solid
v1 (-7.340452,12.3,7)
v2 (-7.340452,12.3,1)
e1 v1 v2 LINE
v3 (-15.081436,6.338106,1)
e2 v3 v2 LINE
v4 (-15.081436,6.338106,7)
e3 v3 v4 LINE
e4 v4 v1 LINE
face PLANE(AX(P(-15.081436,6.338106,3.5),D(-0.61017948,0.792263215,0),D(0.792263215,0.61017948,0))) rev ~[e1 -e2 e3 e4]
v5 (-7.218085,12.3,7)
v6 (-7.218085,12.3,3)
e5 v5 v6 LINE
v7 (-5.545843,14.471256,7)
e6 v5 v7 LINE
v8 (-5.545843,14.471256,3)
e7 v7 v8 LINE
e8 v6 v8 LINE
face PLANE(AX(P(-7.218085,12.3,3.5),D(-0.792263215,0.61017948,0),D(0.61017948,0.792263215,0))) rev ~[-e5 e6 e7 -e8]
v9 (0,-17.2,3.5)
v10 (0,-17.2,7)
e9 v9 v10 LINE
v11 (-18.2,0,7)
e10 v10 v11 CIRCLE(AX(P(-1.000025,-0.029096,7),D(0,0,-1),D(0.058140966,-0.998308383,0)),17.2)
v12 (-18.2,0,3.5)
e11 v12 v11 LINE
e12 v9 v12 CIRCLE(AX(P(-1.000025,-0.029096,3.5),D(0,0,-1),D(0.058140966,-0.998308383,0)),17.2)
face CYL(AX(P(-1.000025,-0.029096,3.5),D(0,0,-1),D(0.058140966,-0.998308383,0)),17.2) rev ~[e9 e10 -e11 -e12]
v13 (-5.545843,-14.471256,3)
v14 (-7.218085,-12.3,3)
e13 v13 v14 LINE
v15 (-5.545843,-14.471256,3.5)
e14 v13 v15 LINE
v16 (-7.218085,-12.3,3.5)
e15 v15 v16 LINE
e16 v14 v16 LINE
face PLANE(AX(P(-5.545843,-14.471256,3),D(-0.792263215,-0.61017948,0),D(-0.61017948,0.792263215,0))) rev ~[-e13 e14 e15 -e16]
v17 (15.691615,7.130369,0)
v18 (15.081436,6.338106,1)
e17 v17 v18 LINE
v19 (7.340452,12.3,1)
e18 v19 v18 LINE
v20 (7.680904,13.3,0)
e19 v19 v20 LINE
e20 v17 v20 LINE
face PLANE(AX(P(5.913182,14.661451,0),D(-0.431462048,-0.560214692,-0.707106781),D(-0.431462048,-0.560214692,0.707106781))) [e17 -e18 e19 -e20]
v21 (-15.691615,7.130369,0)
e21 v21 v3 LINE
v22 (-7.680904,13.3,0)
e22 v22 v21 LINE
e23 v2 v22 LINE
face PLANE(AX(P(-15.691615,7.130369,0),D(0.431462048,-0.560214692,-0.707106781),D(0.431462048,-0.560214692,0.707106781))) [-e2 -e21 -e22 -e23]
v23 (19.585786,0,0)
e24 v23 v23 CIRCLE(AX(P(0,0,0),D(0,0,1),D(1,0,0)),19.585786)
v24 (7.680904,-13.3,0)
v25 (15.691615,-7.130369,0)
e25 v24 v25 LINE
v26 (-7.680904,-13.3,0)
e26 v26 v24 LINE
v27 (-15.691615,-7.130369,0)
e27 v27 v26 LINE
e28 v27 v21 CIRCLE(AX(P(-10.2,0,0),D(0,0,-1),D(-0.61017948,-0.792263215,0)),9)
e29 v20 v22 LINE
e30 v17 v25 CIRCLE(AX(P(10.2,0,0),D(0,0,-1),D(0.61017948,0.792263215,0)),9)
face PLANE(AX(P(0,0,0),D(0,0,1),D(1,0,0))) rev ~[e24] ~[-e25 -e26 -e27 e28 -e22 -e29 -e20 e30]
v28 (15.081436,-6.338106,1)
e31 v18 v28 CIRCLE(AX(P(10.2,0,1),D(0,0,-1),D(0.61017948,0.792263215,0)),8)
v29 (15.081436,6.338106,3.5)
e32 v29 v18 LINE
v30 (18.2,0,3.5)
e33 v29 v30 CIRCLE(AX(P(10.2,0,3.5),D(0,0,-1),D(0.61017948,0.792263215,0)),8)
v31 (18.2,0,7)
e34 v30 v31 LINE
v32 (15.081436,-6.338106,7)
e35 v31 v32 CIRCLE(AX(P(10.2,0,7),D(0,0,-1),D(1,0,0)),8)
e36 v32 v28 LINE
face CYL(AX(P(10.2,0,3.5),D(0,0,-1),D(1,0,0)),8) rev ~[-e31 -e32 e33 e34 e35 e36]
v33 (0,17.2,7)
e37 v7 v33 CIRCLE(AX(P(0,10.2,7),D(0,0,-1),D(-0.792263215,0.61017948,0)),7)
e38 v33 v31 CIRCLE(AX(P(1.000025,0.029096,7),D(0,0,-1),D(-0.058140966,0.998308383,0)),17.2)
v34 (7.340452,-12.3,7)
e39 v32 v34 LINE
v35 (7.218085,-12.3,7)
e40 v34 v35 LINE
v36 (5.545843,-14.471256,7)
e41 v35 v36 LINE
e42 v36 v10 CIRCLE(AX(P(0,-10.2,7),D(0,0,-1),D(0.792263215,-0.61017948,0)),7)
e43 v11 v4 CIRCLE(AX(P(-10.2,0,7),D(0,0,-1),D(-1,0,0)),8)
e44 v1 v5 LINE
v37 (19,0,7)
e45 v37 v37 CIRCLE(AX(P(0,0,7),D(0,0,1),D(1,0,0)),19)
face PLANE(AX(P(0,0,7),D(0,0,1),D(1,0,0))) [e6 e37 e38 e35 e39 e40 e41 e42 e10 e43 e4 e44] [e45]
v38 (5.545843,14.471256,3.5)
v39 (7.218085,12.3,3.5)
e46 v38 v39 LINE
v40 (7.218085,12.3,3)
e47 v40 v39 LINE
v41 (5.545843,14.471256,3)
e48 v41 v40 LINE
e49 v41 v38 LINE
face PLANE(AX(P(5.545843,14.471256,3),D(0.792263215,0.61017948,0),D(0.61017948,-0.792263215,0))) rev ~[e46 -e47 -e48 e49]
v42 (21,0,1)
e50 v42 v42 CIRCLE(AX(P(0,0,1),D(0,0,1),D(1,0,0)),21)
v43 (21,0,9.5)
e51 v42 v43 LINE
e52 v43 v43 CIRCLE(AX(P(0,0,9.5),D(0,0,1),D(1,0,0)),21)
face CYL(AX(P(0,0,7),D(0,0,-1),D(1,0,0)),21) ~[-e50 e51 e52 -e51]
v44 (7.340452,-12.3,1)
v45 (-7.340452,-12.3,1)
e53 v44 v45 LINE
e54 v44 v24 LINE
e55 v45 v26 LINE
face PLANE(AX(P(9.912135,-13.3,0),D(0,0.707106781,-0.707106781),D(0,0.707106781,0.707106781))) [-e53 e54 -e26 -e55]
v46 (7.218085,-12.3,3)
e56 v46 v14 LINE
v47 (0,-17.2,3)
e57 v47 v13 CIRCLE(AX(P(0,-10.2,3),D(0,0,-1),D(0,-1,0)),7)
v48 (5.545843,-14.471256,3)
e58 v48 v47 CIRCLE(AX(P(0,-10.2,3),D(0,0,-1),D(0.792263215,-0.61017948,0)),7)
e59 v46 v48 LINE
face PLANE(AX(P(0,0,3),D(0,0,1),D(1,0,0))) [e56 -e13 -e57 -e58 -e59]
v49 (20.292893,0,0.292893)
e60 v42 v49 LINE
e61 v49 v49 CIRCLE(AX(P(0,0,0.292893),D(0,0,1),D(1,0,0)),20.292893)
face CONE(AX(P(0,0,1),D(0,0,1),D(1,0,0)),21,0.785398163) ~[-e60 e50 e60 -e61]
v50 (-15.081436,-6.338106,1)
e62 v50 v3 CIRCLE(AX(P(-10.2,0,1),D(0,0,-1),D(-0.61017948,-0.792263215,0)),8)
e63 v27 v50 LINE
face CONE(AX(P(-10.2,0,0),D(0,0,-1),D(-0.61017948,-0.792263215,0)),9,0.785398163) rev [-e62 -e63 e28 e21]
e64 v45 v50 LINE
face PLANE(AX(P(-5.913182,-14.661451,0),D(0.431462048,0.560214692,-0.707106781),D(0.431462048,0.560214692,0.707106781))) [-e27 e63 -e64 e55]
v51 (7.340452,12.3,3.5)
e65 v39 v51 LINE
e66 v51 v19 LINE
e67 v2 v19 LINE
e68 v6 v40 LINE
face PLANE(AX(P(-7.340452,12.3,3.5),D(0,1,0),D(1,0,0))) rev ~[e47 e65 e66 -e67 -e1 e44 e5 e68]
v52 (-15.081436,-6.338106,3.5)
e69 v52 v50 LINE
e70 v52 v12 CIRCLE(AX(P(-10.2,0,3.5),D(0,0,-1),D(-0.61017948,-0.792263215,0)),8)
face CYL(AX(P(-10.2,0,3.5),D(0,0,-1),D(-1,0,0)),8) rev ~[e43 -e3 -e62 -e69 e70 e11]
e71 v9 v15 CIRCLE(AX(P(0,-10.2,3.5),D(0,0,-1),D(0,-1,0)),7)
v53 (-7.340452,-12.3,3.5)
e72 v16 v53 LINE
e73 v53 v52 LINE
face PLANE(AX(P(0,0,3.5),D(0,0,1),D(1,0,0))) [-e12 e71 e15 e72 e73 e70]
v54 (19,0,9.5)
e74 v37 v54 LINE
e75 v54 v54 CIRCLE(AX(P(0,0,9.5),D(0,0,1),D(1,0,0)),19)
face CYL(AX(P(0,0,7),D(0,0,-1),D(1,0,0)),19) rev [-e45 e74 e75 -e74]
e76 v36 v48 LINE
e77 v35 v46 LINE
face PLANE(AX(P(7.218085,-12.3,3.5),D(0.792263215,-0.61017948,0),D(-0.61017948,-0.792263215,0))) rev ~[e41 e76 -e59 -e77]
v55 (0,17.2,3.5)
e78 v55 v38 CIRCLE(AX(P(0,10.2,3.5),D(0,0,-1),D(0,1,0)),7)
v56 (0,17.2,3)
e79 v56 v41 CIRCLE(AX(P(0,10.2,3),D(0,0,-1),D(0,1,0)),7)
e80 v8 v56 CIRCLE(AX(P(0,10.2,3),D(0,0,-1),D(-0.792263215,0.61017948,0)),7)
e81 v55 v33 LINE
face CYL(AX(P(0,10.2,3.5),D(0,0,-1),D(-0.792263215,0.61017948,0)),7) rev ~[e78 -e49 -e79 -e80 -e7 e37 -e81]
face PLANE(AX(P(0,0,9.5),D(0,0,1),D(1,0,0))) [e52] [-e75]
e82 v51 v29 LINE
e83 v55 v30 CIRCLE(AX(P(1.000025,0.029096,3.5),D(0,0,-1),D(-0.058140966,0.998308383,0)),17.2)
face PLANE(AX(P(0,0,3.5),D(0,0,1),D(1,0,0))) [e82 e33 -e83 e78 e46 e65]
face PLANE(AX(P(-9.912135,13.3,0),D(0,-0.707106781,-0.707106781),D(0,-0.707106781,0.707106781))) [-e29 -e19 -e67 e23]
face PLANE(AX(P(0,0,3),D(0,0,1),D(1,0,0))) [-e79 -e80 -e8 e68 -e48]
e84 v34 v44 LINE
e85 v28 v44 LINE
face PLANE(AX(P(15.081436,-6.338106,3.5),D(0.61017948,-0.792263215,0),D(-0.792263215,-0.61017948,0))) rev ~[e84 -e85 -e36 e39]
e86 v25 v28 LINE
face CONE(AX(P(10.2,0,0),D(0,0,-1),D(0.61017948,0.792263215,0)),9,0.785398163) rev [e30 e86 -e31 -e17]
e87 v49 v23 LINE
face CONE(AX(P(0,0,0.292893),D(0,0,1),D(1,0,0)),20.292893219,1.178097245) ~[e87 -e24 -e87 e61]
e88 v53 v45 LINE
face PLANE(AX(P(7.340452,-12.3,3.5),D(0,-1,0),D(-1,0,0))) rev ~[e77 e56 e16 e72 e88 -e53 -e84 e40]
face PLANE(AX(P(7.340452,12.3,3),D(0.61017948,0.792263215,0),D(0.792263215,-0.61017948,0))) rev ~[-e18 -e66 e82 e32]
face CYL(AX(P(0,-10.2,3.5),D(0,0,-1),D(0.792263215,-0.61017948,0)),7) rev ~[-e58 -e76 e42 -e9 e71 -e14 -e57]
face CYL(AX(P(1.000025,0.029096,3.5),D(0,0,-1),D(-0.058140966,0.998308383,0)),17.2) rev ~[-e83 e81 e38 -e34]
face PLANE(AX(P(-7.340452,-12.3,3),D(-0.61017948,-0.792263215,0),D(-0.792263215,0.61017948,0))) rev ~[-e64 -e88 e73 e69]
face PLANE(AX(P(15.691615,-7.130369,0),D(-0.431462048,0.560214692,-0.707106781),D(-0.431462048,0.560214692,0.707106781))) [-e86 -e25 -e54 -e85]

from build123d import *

# Parameters (mm, degrees)
F0_R         = 21
F1_DEPTH     = 3
F2_R         = 21
F3_DEPTH     = 0.5
F4_R         = 21
F5_DEPTH     = 3.5
F6_R         = 21
F6_R_2       = 19
F7_DEPTH     = 2.5
F8_SIZE      = 1
F9_T6_DEPTH  = 12.3424053326
F9_T11_DEPTH = 19.8242698458
F9_T17_DEPTH = 12.3424053326
F9_T20_ANGLE = 104.7950367117
F9_T24_DEPTH = 12.3424053326
F9_T29_DEPTH = 19.8242698458
F9_T35_DEPTH = 12.3424053326
F9_T38_ANGLE = 104.7950367117
F9_T43_DEPTH = 12.3424053326
F9_T47_DEPTH = 19.8242698458
F9_T54_DEPTH = 19.8242698458
F9_T58_DEPTH = 12.3424053326
F9_T65_DEPTH = 12.3424053326
F9_T69_DEPTH = 19.8242698458
F9_T76_DEPTH = 19.8242698458
F9_T80_DEPTH = 12.3424053326


# Not quite as in the source:
# - a fillet or chamfer that OpenCascade refuses, or shapes differently, is made with other operations: its cross-section is extruded or revolved along the edge and cut away or added


with BuildPart() as f1:
    # F0 (on Top) → F1 (new body)
    with BuildSketch(Plane.XY):
        Circle(F0_R)
        with BuildLine():
            Line((-15.0814358373, 6.3381057238), (-7.340451935, 12.3))
            Line((-7.340451935, 12.3), (7.340451935, 12.3))
            Line((7.340451935, 12.3), (15.0814358373, 6.3381057238))
            ThreePointArc((15.0814358373, 6.3381057238), (18.2, 0), (15.0814358373, -6.3381057238))
            Line((15.0814358373, -6.3381057238), (7.340451935, -12.3))
            Line((7.340451935, -12.3), (-7.340451935, -12.3))
            Line((-7.340451935, -12.3), (-15.0814358373, -6.3381057238))
            ThreePointArc((-15.0814358373, -6.3381057238), (-18.2, 0), (-15.0814358373, 6.3381057238))
        make_face(mode=Mode.SUBTRACT)
    extrude(amount=F1_DEPTH)

    # F2 (on face) → F3 (join)
    with BuildSketch(Plane.XY.offset(3)):
        Circle(F2_R)
        with BuildLine():
            Line((-15.0814358373, 6.3381057238), (-7.340451935, 12.3))
            Line((-7.340451935, 12.3), (-7.2180848246, 12.3))
            Line((-7.2180848246, 12.3), (-5.5458425084, 14.4712563576))
            ThreePointArc((-5.5458425084, 14.4712563576), (-3.0904049489, 16.4808755163), (0, 17.2))
            ThreePointArc((0, 17.2), (3.0904049489, 16.4808755163), (5.5458425084, 14.4712563576))
            Line((5.5458425084, 14.4712563576), (7.2180848246, 12.3))
            Line((7.2180848246, 12.3), (7.340451935, 12.3))
            Line((7.340451935, 12.3), (15.0814358373, 6.3381057238))
            ThreePointArc((15.0814358373, 6.3381057238), (17.3781434472, 3.5318913702), (18.2, 0))
            ThreePointArc((18.2, 0), (17.3781434472, -3.5318913702), (15.0814358373, -6.3381057238))
            Line((15.0814358373, -6.3381057238), (7.340451935, -12.3))
            Line((7.340451935, -12.3), (7.2180848246, -12.3))
            Line((7.2180848246, -12.3), (5.5458425084, -14.4712563576))
            ThreePointArc((5.5458425084, -14.4712563576), (3.0904049489, -16.4808755163), (0, -17.2))
            ThreePointArc((0, -17.2), (-3.0904049489, -16.4808755163), (-5.5458425084, -14.4712563576))
            Line((-5.5458425084, -14.4712563576), (-7.2180848246, -12.3))
            Line((-7.2180848246, -12.3), (-7.340451935, -12.3))
            Line((-7.340451935, -12.3), (-15.0814358373, -6.3381057238))
            ThreePointArc((-15.0814358373, -6.3381057238), (-17.3781434472, -3.5318913702), (-18.2, 0))
            ThreePointArc((-18.2, 0), (-17.3781434472, 3.5318913702), (-15.0814358373, 6.3381057238))
        make_face(mode=Mode.SUBTRACT)
    extrude(amount=F3_DEPTH)

    # F4 (on face) → F5 (join)
    with BuildSketch(Plane.XY.offset(3.5)):
        Circle(F4_R)
        with BuildLine():
            Line((-15.0814358373, 6.3381057238), (-7.340451935, 12.3))
            Line((-7.340451935, 12.3), (-7.2180848246, 12.3))
            Line((-7.2180848246, 12.3), (-5.5458425084, 14.4712563576))
            ThreePointArc((-5.5458425084, 14.4712563576), (-3.0904049489, 16.4808755163), (0, 17.2))
            ThreePointArc((0, 17.2), (12.8139825122, 12.529911728), (18.2, 0))
            ThreePointArc((18.2, 0), (17.3781434472, -3.5318913702), (15.0814358373, -6.3381057238))
            Line((15.0814358373, -6.3381057238), (7.340451935, -12.3))
            Line((7.340451935, -12.3), (7.2180848246, -12.3))
            Line((7.2180848246, -12.3), (5.5458425084, -14.4712563576))
            ThreePointArc((5.5458425084, -14.4712563576), (3.0904049489, -16.4808755163), (0, -17.2))
            ThreePointArc((0, -17.2), (-12.8139825122, -12.529911728), (-18.2, 0))
            ThreePointArc((-18.2, 0), (-17.3781434472, 3.5318913702), (-15.0814358373, 6.3381057238))
        make_face(mode=Mode.SUBTRACT)
    extrude(amount=F5_DEPTH)

    # F6 (on face) → F7 (join)
    with BuildSketch(Plane.XY.offset(7)):
        Circle(F6_R)
        Circle(F6_R_2, mode=Mode.SUBTRACT)
    extrude(amount=F7_DEPTH)

    # F8
    f8_edges = [f1.edges().sort_by_distance(p)[0] for p in [
        (-21, 0, 0),
    ]]
    chamfer(f8_edges, length=F8_SIZE)

    # F9: chamfer of 1 on 9 edges, made by hand

    # F9_s1 → F9_t2 (revolve, cut)
    with BuildSketch(Plane.XZ):
        Polygon((20.2928932188, 0.2928932188), (19.5857864376, 0), (20, 0), align=None)
    revolve(axis=Axis((0, 0, 0), (0, 0, 1)), mode=Mode.SUBTRACT)


with BuildPart() as f9_tool4:
    # F9_s5 → F9_t6 (new body)
    with BuildSketch(Plane(origin=(-6.4023462265, -4.9309121171, 0), x_dir=(0, 0, 1), z_dir=(0.7922632155, 0.6101794797, 0))):
        Polygon((0, -15.2238306925), (1, -14.2238306925), (0, -14.2238306925), align=None)
    extrude(amount=F9_T6_DEPTH)

    split(bisect_by=Plane.XZ.offset(-12.3), keep=Keep.TOP)


with BuildPart() as f1_1:
    add(f1.part)

    # F9_t3: cut F9_tool4
    add(f9_tool4.part, mode=Mode.SUBTRACT)


with BuildPart() as f9_tool9:
    # F9_s10 → F9_t11 (new body)
    with BuildSketch(Plane.YZ.offset(-9.9121349229)):
        Polygon((13.3, 0), (12.3, 1), (12.3, 0), align=None)
    extrude(amount=F9_T11_DEPTH)

    split(bisect_by=Plane(origin=(-8.6790896108, 11.2690178409, 0), x_dir=(0, 0, 1), z_dir=(0.6101794797, -0.7922632155, 0)), keep=Keep.TOP)

    split(bisect_by=Plane(origin=(8.6790896108, 11.2690178409, 0), x_dir=(0, 0, 1), z_dir=(-0.6101794797, -0.7922632155, 0)), keep=Keep.TOP)


with BuildPart() as f1_2:
    add(f1_1.part)

    # F9_t8: cut F9_tool9
    add(f9_tool9.part, mode=Mode.SUBTRACT)


with BuildPart() as f9_tool15:
    # F9_s16 → F9_t17 (new body)
    with BuildSketch(Plane(origin=(-3.376087509, 2.6001703465, 0), x_dir=(0, 0, 1), z_dir=(0.7922632155, -0.6101794797, 0))):
        Polygon((0, -15.2238306925), (1, -14.2238306925), (0, -14.2238306925), align=None)
    extrude(amount=F9_T17_DEPTH)

    split(bisect_by=Plane.XZ.offset(-12.3), keep=Keep.TOP)


with BuildPart() as f1_3:
    add(f1_2.part)

    # F9_t14: cut F9_tool15
    add(f9_tool15.part, mode=Mode.SUBTRACT)

    # F9_s19 → F9_t20 (revolve, cut)
    with BuildSketch(Plane(origin=(6.4023462265, -4.9309121171, 0), x_dir=(0, 0, 1), z_dir=(-0.7922632155, 0.6101794797, 0))):
        Polygon((0, 15.2238306925), (1, 14.2238306925), (0, 14.2238306925), align=None)
    revolve(axis=Axis((10.2, 0, 0), (0, 0, -1)), revolution_arc=F9_T20_ANGLE, mode=Mode.SUBTRACT)


with BuildPart() as f9_tool22:
    # F9_s23 → F9_t24 (new body)
    with BuildSketch(Plane(origin=(6.4023462265, 4.9309121171, 0), x_dir=(0, 0, 1), z_dir=(-0.7922632155, -0.6101794797, 0))):
        Polygon((0, -15.2238306925), (1, -14.2238306925), (0, -14.2238306925), align=None)
    extrude(amount=F9_T24_DEPTH)

    split(bisect_by=Plane.XZ.offset(12.3), keep=Keep.BOTTOM)


with BuildPart() as f1_4:
    add(f1_3.part)

    # F9_t21: cut F9_tool22
    add(f9_tool22.part, mode=Mode.SUBTRACT)


with BuildPart() as f9_tool27:
    # F9_s28 → F9_t29 (new body)
    with BuildSketch(Plane.YZ.offset(9.9121349229)):
        Polygon((-13.3, 0), (-12.3, 1), (-12.3, 0), align=None)
    extrude(amount=-F9_T29_DEPTH)

    split(bisect_by=Plane(origin=(8.6790896108, -11.2690178409, 0), x_dir=(0, 0, 1), z_dir=(-0.6101794797, 0.7922632155, 0)), keep=Keep.TOP)

    split(bisect_by=Plane(origin=(-8.6790896108, -11.2690178409, 0), x_dir=(0, 0, 1), z_dir=(0.6101794797, 0.7922632155, 0)), keep=Keep.TOP)


with BuildPart() as f1_5:
    add(f1_4.part)

    # F9_t26: cut F9_tool27
    add(f9_tool27.part, mode=Mode.SUBTRACT)


with BuildPart() as f9_tool33:
    # F9_s34 → F9_t35 (new body)
    with BuildSketch(Plane(origin=(3.376087509, -2.6001703465, 0), x_dir=(0, 0, 1), z_dir=(-0.7922632155, 0.6101794797, 0))):
        Polygon((0, -15.2238306925), (1, -14.2238306925), (0, -14.2238306925), align=None)
    extrude(amount=F9_T35_DEPTH)

    split(bisect_by=Plane.XZ.offset(12.3), keep=Keep.BOTTOM)


with BuildPart() as f1_6:
    add(f1_5.part)

    # F9_t32: cut F9_tool33
    add(f9_tool33.part, mode=Mode.SUBTRACT)

    # F9_s37 → F9_t38 (revolve, cut)
    with BuildSketch(Plane(origin=(-6.4023462265, 4.9309121171, 0), x_dir=(0, 0, 1), z_dir=(0.7922632155, -0.6101794797, 0))):
        Polygon((0, 15.2238306925), (1, 14.2238306925), (0, 14.2238306925), align=None)
    revolve(axis=Axis((-10.2, 0, 0), (0, 0, -1)), revolution_arc=F9_T38_ANGLE, mode=Mode.SUBTRACT)


with BuildPart() as f9_tool41:
    # F9_s42 → F9_t43 (new body)
    with BuildSketch(Plane(origin=(-6.4023462265, -4.9309121171, 0), x_dir=(0, 0, 1), z_dir=(0.7922632155, 0.6101794797, 0))):
        Polygon((0, -15.2238306925), (1, -14.2238306925), (0, -14.2238306925), align=None)
    extrude(amount=F9_T43_DEPTH)

    split(bisect_by=Plane.XZ.offset(-12.3), keep=Keep.BOTTOM)


with BuildPart() as f9_tool45:
    # F9_s46 → F9_t47 (new body)
    with BuildSketch(Plane.YZ.offset(-9.9121349229)):
        Polygon((13.3, 0), (12.3, 1), (12.3, 0), align=None)
    extrude(amount=F9_T47_DEPTH)

    split(bisect_by=Plane(origin=(-8.6790896108, 11.2690178409, 0), x_dir=(0, 0, 1), z_dir=(-0.6101794797, 0.7922632155, 0)), keep=Keep.TOP)


with BuildPart() as f9_tool41_1:
    add(f9_tool41.part)

    # F9_t49: intersect F9_tool45
    add(f9_tool45.part, mode=Mode.INTERSECT)


with BuildPart() as f1_7:
    add(f1_6.part)

    # F9_t39: cut F9_tool41
    add(f9_tool41_1.part, mode=Mode.SUBTRACT)


with BuildPart() as f9_tool52:
    # F9_s53 → F9_t54 (new body)
    with BuildSketch(Plane.YZ.offset(-9.9121349229)):
        Polygon((13.3, 0), (12.3, 1), (12.3, 0), align=None)
    extrude(amount=F9_T54_DEPTH)

    split(bisect_by=Plane(origin=(8.6790896108, 11.2690178409, 0), x_dir=(0, 0, 1), z_dir=(0.6101794797, 0.7922632155, 0)), keep=Keep.TOP)


with BuildPart() as f9_tool56:
    # F9_s57 → F9_t58 (new body)
    with BuildSketch(Plane(origin=(-3.376087509, 2.6001703465, 0), x_dir=(0, 0, 1), z_dir=(0.7922632155, -0.6101794797, 0))):
        Polygon((0, -15.2238306925), (1, -14.2238306925), (0, -14.2238306925), align=None)
    extrude(amount=F9_T58_DEPTH)

    split(bisect_by=Plane.XZ.offset(-12.3), keep=Keep.BOTTOM)


with BuildPart() as f9_tool52_1:
    add(f9_tool52.part)

    # F9_t60: intersect F9_tool56
    add(f9_tool56.part, mode=Mode.INTERSECT)


with BuildPart() as f1_8:
    add(f1_7.part)

    # F9_t50: cut F9_tool52
    add(f9_tool52_1.part, mode=Mode.SUBTRACT)


with BuildPart() as f9_tool63:
    # F9_s64 → F9_t65 (new body)
    with BuildSketch(Plane(origin=(6.4023462265, 4.9309121171, 0), x_dir=(0, 0, 1), z_dir=(-0.7922632155, -0.6101794797, 0))):
        Polygon((0, -15.2238306925), (1, -14.2238306925), (0, -14.2238306925), align=None)
    extrude(amount=F9_T65_DEPTH)

    split(bisect_by=Plane.XZ.offset(12.3), keep=Keep.TOP)


with BuildPart() as f9_tool67:
    # F9_s68 → F9_t69 (new body)
    with BuildSketch(Plane.YZ.offset(9.9121349229)):
        Polygon((-13.3, 0), (-12.3, 1), (-12.3, 0), align=None)
    extrude(amount=-F9_T69_DEPTH)

    split(bisect_by=Plane(origin=(8.6790896108, -11.2690178409, 0), x_dir=(0, 0, 1), z_dir=(0.6101794797, -0.7922632155, 0)), keep=Keep.TOP)


with BuildPart() as f9_tool63_1:
    add(f9_tool63.part)

    # F9_t71: intersect F9_tool67
    add(f9_tool67.part, mode=Mode.INTERSECT)


with BuildPart() as f1_9:
    add(f1_8.part)

    # F9_t61: cut F9_tool63
    add(f9_tool63_1.part, mode=Mode.SUBTRACT)


with BuildPart() as f9_tool74:
    # F9_s75 → F9_t76 (new body)
    with BuildSketch(Plane.YZ.offset(9.9121349229)):
        Polygon((-13.3, 0), (-12.3, 1), (-12.3, 0), align=None)
    extrude(amount=-F9_T76_DEPTH)

    split(bisect_by=Plane(origin=(-8.6790896108, -11.2690178409, 0), x_dir=(0, 0, 1), z_dir=(-0.6101794797, -0.7922632155, 0)), keep=Keep.TOP)


with BuildPart() as f9_tool78:
    # F9_s79 → F9_t80 (new body)
    with BuildSketch(Plane(origin=(3.376087509, -2.6001703465, 0), x_dir=(0, 0, 1), z_dir=(-0.7922632155, 0.6101794797, 0))):
        Polygon((0, -15.2238306925), (1, -14.2238306925), (0, -14.2238306925), align=None)
    extrude(amount=F9_T80_DEPTH)

    split(bisect_by=Plane.XZ.offset(12.3), keep=Keep.TOP)


with BuildPart() as f9_tool74_1:
    add(f9_tool74.part)

    # F9_t82: intersect F9_tool78
    add(f9_tool78.part, mode=Mode.INTERSECT)


with BuildPart() as f1_10:
    add(f1_9.part)

    # F9_t72: cut F9_tool74
    add(f9_tool74_1.part, mode=Mode.SUBTRACT)


solid = f1_10.part
